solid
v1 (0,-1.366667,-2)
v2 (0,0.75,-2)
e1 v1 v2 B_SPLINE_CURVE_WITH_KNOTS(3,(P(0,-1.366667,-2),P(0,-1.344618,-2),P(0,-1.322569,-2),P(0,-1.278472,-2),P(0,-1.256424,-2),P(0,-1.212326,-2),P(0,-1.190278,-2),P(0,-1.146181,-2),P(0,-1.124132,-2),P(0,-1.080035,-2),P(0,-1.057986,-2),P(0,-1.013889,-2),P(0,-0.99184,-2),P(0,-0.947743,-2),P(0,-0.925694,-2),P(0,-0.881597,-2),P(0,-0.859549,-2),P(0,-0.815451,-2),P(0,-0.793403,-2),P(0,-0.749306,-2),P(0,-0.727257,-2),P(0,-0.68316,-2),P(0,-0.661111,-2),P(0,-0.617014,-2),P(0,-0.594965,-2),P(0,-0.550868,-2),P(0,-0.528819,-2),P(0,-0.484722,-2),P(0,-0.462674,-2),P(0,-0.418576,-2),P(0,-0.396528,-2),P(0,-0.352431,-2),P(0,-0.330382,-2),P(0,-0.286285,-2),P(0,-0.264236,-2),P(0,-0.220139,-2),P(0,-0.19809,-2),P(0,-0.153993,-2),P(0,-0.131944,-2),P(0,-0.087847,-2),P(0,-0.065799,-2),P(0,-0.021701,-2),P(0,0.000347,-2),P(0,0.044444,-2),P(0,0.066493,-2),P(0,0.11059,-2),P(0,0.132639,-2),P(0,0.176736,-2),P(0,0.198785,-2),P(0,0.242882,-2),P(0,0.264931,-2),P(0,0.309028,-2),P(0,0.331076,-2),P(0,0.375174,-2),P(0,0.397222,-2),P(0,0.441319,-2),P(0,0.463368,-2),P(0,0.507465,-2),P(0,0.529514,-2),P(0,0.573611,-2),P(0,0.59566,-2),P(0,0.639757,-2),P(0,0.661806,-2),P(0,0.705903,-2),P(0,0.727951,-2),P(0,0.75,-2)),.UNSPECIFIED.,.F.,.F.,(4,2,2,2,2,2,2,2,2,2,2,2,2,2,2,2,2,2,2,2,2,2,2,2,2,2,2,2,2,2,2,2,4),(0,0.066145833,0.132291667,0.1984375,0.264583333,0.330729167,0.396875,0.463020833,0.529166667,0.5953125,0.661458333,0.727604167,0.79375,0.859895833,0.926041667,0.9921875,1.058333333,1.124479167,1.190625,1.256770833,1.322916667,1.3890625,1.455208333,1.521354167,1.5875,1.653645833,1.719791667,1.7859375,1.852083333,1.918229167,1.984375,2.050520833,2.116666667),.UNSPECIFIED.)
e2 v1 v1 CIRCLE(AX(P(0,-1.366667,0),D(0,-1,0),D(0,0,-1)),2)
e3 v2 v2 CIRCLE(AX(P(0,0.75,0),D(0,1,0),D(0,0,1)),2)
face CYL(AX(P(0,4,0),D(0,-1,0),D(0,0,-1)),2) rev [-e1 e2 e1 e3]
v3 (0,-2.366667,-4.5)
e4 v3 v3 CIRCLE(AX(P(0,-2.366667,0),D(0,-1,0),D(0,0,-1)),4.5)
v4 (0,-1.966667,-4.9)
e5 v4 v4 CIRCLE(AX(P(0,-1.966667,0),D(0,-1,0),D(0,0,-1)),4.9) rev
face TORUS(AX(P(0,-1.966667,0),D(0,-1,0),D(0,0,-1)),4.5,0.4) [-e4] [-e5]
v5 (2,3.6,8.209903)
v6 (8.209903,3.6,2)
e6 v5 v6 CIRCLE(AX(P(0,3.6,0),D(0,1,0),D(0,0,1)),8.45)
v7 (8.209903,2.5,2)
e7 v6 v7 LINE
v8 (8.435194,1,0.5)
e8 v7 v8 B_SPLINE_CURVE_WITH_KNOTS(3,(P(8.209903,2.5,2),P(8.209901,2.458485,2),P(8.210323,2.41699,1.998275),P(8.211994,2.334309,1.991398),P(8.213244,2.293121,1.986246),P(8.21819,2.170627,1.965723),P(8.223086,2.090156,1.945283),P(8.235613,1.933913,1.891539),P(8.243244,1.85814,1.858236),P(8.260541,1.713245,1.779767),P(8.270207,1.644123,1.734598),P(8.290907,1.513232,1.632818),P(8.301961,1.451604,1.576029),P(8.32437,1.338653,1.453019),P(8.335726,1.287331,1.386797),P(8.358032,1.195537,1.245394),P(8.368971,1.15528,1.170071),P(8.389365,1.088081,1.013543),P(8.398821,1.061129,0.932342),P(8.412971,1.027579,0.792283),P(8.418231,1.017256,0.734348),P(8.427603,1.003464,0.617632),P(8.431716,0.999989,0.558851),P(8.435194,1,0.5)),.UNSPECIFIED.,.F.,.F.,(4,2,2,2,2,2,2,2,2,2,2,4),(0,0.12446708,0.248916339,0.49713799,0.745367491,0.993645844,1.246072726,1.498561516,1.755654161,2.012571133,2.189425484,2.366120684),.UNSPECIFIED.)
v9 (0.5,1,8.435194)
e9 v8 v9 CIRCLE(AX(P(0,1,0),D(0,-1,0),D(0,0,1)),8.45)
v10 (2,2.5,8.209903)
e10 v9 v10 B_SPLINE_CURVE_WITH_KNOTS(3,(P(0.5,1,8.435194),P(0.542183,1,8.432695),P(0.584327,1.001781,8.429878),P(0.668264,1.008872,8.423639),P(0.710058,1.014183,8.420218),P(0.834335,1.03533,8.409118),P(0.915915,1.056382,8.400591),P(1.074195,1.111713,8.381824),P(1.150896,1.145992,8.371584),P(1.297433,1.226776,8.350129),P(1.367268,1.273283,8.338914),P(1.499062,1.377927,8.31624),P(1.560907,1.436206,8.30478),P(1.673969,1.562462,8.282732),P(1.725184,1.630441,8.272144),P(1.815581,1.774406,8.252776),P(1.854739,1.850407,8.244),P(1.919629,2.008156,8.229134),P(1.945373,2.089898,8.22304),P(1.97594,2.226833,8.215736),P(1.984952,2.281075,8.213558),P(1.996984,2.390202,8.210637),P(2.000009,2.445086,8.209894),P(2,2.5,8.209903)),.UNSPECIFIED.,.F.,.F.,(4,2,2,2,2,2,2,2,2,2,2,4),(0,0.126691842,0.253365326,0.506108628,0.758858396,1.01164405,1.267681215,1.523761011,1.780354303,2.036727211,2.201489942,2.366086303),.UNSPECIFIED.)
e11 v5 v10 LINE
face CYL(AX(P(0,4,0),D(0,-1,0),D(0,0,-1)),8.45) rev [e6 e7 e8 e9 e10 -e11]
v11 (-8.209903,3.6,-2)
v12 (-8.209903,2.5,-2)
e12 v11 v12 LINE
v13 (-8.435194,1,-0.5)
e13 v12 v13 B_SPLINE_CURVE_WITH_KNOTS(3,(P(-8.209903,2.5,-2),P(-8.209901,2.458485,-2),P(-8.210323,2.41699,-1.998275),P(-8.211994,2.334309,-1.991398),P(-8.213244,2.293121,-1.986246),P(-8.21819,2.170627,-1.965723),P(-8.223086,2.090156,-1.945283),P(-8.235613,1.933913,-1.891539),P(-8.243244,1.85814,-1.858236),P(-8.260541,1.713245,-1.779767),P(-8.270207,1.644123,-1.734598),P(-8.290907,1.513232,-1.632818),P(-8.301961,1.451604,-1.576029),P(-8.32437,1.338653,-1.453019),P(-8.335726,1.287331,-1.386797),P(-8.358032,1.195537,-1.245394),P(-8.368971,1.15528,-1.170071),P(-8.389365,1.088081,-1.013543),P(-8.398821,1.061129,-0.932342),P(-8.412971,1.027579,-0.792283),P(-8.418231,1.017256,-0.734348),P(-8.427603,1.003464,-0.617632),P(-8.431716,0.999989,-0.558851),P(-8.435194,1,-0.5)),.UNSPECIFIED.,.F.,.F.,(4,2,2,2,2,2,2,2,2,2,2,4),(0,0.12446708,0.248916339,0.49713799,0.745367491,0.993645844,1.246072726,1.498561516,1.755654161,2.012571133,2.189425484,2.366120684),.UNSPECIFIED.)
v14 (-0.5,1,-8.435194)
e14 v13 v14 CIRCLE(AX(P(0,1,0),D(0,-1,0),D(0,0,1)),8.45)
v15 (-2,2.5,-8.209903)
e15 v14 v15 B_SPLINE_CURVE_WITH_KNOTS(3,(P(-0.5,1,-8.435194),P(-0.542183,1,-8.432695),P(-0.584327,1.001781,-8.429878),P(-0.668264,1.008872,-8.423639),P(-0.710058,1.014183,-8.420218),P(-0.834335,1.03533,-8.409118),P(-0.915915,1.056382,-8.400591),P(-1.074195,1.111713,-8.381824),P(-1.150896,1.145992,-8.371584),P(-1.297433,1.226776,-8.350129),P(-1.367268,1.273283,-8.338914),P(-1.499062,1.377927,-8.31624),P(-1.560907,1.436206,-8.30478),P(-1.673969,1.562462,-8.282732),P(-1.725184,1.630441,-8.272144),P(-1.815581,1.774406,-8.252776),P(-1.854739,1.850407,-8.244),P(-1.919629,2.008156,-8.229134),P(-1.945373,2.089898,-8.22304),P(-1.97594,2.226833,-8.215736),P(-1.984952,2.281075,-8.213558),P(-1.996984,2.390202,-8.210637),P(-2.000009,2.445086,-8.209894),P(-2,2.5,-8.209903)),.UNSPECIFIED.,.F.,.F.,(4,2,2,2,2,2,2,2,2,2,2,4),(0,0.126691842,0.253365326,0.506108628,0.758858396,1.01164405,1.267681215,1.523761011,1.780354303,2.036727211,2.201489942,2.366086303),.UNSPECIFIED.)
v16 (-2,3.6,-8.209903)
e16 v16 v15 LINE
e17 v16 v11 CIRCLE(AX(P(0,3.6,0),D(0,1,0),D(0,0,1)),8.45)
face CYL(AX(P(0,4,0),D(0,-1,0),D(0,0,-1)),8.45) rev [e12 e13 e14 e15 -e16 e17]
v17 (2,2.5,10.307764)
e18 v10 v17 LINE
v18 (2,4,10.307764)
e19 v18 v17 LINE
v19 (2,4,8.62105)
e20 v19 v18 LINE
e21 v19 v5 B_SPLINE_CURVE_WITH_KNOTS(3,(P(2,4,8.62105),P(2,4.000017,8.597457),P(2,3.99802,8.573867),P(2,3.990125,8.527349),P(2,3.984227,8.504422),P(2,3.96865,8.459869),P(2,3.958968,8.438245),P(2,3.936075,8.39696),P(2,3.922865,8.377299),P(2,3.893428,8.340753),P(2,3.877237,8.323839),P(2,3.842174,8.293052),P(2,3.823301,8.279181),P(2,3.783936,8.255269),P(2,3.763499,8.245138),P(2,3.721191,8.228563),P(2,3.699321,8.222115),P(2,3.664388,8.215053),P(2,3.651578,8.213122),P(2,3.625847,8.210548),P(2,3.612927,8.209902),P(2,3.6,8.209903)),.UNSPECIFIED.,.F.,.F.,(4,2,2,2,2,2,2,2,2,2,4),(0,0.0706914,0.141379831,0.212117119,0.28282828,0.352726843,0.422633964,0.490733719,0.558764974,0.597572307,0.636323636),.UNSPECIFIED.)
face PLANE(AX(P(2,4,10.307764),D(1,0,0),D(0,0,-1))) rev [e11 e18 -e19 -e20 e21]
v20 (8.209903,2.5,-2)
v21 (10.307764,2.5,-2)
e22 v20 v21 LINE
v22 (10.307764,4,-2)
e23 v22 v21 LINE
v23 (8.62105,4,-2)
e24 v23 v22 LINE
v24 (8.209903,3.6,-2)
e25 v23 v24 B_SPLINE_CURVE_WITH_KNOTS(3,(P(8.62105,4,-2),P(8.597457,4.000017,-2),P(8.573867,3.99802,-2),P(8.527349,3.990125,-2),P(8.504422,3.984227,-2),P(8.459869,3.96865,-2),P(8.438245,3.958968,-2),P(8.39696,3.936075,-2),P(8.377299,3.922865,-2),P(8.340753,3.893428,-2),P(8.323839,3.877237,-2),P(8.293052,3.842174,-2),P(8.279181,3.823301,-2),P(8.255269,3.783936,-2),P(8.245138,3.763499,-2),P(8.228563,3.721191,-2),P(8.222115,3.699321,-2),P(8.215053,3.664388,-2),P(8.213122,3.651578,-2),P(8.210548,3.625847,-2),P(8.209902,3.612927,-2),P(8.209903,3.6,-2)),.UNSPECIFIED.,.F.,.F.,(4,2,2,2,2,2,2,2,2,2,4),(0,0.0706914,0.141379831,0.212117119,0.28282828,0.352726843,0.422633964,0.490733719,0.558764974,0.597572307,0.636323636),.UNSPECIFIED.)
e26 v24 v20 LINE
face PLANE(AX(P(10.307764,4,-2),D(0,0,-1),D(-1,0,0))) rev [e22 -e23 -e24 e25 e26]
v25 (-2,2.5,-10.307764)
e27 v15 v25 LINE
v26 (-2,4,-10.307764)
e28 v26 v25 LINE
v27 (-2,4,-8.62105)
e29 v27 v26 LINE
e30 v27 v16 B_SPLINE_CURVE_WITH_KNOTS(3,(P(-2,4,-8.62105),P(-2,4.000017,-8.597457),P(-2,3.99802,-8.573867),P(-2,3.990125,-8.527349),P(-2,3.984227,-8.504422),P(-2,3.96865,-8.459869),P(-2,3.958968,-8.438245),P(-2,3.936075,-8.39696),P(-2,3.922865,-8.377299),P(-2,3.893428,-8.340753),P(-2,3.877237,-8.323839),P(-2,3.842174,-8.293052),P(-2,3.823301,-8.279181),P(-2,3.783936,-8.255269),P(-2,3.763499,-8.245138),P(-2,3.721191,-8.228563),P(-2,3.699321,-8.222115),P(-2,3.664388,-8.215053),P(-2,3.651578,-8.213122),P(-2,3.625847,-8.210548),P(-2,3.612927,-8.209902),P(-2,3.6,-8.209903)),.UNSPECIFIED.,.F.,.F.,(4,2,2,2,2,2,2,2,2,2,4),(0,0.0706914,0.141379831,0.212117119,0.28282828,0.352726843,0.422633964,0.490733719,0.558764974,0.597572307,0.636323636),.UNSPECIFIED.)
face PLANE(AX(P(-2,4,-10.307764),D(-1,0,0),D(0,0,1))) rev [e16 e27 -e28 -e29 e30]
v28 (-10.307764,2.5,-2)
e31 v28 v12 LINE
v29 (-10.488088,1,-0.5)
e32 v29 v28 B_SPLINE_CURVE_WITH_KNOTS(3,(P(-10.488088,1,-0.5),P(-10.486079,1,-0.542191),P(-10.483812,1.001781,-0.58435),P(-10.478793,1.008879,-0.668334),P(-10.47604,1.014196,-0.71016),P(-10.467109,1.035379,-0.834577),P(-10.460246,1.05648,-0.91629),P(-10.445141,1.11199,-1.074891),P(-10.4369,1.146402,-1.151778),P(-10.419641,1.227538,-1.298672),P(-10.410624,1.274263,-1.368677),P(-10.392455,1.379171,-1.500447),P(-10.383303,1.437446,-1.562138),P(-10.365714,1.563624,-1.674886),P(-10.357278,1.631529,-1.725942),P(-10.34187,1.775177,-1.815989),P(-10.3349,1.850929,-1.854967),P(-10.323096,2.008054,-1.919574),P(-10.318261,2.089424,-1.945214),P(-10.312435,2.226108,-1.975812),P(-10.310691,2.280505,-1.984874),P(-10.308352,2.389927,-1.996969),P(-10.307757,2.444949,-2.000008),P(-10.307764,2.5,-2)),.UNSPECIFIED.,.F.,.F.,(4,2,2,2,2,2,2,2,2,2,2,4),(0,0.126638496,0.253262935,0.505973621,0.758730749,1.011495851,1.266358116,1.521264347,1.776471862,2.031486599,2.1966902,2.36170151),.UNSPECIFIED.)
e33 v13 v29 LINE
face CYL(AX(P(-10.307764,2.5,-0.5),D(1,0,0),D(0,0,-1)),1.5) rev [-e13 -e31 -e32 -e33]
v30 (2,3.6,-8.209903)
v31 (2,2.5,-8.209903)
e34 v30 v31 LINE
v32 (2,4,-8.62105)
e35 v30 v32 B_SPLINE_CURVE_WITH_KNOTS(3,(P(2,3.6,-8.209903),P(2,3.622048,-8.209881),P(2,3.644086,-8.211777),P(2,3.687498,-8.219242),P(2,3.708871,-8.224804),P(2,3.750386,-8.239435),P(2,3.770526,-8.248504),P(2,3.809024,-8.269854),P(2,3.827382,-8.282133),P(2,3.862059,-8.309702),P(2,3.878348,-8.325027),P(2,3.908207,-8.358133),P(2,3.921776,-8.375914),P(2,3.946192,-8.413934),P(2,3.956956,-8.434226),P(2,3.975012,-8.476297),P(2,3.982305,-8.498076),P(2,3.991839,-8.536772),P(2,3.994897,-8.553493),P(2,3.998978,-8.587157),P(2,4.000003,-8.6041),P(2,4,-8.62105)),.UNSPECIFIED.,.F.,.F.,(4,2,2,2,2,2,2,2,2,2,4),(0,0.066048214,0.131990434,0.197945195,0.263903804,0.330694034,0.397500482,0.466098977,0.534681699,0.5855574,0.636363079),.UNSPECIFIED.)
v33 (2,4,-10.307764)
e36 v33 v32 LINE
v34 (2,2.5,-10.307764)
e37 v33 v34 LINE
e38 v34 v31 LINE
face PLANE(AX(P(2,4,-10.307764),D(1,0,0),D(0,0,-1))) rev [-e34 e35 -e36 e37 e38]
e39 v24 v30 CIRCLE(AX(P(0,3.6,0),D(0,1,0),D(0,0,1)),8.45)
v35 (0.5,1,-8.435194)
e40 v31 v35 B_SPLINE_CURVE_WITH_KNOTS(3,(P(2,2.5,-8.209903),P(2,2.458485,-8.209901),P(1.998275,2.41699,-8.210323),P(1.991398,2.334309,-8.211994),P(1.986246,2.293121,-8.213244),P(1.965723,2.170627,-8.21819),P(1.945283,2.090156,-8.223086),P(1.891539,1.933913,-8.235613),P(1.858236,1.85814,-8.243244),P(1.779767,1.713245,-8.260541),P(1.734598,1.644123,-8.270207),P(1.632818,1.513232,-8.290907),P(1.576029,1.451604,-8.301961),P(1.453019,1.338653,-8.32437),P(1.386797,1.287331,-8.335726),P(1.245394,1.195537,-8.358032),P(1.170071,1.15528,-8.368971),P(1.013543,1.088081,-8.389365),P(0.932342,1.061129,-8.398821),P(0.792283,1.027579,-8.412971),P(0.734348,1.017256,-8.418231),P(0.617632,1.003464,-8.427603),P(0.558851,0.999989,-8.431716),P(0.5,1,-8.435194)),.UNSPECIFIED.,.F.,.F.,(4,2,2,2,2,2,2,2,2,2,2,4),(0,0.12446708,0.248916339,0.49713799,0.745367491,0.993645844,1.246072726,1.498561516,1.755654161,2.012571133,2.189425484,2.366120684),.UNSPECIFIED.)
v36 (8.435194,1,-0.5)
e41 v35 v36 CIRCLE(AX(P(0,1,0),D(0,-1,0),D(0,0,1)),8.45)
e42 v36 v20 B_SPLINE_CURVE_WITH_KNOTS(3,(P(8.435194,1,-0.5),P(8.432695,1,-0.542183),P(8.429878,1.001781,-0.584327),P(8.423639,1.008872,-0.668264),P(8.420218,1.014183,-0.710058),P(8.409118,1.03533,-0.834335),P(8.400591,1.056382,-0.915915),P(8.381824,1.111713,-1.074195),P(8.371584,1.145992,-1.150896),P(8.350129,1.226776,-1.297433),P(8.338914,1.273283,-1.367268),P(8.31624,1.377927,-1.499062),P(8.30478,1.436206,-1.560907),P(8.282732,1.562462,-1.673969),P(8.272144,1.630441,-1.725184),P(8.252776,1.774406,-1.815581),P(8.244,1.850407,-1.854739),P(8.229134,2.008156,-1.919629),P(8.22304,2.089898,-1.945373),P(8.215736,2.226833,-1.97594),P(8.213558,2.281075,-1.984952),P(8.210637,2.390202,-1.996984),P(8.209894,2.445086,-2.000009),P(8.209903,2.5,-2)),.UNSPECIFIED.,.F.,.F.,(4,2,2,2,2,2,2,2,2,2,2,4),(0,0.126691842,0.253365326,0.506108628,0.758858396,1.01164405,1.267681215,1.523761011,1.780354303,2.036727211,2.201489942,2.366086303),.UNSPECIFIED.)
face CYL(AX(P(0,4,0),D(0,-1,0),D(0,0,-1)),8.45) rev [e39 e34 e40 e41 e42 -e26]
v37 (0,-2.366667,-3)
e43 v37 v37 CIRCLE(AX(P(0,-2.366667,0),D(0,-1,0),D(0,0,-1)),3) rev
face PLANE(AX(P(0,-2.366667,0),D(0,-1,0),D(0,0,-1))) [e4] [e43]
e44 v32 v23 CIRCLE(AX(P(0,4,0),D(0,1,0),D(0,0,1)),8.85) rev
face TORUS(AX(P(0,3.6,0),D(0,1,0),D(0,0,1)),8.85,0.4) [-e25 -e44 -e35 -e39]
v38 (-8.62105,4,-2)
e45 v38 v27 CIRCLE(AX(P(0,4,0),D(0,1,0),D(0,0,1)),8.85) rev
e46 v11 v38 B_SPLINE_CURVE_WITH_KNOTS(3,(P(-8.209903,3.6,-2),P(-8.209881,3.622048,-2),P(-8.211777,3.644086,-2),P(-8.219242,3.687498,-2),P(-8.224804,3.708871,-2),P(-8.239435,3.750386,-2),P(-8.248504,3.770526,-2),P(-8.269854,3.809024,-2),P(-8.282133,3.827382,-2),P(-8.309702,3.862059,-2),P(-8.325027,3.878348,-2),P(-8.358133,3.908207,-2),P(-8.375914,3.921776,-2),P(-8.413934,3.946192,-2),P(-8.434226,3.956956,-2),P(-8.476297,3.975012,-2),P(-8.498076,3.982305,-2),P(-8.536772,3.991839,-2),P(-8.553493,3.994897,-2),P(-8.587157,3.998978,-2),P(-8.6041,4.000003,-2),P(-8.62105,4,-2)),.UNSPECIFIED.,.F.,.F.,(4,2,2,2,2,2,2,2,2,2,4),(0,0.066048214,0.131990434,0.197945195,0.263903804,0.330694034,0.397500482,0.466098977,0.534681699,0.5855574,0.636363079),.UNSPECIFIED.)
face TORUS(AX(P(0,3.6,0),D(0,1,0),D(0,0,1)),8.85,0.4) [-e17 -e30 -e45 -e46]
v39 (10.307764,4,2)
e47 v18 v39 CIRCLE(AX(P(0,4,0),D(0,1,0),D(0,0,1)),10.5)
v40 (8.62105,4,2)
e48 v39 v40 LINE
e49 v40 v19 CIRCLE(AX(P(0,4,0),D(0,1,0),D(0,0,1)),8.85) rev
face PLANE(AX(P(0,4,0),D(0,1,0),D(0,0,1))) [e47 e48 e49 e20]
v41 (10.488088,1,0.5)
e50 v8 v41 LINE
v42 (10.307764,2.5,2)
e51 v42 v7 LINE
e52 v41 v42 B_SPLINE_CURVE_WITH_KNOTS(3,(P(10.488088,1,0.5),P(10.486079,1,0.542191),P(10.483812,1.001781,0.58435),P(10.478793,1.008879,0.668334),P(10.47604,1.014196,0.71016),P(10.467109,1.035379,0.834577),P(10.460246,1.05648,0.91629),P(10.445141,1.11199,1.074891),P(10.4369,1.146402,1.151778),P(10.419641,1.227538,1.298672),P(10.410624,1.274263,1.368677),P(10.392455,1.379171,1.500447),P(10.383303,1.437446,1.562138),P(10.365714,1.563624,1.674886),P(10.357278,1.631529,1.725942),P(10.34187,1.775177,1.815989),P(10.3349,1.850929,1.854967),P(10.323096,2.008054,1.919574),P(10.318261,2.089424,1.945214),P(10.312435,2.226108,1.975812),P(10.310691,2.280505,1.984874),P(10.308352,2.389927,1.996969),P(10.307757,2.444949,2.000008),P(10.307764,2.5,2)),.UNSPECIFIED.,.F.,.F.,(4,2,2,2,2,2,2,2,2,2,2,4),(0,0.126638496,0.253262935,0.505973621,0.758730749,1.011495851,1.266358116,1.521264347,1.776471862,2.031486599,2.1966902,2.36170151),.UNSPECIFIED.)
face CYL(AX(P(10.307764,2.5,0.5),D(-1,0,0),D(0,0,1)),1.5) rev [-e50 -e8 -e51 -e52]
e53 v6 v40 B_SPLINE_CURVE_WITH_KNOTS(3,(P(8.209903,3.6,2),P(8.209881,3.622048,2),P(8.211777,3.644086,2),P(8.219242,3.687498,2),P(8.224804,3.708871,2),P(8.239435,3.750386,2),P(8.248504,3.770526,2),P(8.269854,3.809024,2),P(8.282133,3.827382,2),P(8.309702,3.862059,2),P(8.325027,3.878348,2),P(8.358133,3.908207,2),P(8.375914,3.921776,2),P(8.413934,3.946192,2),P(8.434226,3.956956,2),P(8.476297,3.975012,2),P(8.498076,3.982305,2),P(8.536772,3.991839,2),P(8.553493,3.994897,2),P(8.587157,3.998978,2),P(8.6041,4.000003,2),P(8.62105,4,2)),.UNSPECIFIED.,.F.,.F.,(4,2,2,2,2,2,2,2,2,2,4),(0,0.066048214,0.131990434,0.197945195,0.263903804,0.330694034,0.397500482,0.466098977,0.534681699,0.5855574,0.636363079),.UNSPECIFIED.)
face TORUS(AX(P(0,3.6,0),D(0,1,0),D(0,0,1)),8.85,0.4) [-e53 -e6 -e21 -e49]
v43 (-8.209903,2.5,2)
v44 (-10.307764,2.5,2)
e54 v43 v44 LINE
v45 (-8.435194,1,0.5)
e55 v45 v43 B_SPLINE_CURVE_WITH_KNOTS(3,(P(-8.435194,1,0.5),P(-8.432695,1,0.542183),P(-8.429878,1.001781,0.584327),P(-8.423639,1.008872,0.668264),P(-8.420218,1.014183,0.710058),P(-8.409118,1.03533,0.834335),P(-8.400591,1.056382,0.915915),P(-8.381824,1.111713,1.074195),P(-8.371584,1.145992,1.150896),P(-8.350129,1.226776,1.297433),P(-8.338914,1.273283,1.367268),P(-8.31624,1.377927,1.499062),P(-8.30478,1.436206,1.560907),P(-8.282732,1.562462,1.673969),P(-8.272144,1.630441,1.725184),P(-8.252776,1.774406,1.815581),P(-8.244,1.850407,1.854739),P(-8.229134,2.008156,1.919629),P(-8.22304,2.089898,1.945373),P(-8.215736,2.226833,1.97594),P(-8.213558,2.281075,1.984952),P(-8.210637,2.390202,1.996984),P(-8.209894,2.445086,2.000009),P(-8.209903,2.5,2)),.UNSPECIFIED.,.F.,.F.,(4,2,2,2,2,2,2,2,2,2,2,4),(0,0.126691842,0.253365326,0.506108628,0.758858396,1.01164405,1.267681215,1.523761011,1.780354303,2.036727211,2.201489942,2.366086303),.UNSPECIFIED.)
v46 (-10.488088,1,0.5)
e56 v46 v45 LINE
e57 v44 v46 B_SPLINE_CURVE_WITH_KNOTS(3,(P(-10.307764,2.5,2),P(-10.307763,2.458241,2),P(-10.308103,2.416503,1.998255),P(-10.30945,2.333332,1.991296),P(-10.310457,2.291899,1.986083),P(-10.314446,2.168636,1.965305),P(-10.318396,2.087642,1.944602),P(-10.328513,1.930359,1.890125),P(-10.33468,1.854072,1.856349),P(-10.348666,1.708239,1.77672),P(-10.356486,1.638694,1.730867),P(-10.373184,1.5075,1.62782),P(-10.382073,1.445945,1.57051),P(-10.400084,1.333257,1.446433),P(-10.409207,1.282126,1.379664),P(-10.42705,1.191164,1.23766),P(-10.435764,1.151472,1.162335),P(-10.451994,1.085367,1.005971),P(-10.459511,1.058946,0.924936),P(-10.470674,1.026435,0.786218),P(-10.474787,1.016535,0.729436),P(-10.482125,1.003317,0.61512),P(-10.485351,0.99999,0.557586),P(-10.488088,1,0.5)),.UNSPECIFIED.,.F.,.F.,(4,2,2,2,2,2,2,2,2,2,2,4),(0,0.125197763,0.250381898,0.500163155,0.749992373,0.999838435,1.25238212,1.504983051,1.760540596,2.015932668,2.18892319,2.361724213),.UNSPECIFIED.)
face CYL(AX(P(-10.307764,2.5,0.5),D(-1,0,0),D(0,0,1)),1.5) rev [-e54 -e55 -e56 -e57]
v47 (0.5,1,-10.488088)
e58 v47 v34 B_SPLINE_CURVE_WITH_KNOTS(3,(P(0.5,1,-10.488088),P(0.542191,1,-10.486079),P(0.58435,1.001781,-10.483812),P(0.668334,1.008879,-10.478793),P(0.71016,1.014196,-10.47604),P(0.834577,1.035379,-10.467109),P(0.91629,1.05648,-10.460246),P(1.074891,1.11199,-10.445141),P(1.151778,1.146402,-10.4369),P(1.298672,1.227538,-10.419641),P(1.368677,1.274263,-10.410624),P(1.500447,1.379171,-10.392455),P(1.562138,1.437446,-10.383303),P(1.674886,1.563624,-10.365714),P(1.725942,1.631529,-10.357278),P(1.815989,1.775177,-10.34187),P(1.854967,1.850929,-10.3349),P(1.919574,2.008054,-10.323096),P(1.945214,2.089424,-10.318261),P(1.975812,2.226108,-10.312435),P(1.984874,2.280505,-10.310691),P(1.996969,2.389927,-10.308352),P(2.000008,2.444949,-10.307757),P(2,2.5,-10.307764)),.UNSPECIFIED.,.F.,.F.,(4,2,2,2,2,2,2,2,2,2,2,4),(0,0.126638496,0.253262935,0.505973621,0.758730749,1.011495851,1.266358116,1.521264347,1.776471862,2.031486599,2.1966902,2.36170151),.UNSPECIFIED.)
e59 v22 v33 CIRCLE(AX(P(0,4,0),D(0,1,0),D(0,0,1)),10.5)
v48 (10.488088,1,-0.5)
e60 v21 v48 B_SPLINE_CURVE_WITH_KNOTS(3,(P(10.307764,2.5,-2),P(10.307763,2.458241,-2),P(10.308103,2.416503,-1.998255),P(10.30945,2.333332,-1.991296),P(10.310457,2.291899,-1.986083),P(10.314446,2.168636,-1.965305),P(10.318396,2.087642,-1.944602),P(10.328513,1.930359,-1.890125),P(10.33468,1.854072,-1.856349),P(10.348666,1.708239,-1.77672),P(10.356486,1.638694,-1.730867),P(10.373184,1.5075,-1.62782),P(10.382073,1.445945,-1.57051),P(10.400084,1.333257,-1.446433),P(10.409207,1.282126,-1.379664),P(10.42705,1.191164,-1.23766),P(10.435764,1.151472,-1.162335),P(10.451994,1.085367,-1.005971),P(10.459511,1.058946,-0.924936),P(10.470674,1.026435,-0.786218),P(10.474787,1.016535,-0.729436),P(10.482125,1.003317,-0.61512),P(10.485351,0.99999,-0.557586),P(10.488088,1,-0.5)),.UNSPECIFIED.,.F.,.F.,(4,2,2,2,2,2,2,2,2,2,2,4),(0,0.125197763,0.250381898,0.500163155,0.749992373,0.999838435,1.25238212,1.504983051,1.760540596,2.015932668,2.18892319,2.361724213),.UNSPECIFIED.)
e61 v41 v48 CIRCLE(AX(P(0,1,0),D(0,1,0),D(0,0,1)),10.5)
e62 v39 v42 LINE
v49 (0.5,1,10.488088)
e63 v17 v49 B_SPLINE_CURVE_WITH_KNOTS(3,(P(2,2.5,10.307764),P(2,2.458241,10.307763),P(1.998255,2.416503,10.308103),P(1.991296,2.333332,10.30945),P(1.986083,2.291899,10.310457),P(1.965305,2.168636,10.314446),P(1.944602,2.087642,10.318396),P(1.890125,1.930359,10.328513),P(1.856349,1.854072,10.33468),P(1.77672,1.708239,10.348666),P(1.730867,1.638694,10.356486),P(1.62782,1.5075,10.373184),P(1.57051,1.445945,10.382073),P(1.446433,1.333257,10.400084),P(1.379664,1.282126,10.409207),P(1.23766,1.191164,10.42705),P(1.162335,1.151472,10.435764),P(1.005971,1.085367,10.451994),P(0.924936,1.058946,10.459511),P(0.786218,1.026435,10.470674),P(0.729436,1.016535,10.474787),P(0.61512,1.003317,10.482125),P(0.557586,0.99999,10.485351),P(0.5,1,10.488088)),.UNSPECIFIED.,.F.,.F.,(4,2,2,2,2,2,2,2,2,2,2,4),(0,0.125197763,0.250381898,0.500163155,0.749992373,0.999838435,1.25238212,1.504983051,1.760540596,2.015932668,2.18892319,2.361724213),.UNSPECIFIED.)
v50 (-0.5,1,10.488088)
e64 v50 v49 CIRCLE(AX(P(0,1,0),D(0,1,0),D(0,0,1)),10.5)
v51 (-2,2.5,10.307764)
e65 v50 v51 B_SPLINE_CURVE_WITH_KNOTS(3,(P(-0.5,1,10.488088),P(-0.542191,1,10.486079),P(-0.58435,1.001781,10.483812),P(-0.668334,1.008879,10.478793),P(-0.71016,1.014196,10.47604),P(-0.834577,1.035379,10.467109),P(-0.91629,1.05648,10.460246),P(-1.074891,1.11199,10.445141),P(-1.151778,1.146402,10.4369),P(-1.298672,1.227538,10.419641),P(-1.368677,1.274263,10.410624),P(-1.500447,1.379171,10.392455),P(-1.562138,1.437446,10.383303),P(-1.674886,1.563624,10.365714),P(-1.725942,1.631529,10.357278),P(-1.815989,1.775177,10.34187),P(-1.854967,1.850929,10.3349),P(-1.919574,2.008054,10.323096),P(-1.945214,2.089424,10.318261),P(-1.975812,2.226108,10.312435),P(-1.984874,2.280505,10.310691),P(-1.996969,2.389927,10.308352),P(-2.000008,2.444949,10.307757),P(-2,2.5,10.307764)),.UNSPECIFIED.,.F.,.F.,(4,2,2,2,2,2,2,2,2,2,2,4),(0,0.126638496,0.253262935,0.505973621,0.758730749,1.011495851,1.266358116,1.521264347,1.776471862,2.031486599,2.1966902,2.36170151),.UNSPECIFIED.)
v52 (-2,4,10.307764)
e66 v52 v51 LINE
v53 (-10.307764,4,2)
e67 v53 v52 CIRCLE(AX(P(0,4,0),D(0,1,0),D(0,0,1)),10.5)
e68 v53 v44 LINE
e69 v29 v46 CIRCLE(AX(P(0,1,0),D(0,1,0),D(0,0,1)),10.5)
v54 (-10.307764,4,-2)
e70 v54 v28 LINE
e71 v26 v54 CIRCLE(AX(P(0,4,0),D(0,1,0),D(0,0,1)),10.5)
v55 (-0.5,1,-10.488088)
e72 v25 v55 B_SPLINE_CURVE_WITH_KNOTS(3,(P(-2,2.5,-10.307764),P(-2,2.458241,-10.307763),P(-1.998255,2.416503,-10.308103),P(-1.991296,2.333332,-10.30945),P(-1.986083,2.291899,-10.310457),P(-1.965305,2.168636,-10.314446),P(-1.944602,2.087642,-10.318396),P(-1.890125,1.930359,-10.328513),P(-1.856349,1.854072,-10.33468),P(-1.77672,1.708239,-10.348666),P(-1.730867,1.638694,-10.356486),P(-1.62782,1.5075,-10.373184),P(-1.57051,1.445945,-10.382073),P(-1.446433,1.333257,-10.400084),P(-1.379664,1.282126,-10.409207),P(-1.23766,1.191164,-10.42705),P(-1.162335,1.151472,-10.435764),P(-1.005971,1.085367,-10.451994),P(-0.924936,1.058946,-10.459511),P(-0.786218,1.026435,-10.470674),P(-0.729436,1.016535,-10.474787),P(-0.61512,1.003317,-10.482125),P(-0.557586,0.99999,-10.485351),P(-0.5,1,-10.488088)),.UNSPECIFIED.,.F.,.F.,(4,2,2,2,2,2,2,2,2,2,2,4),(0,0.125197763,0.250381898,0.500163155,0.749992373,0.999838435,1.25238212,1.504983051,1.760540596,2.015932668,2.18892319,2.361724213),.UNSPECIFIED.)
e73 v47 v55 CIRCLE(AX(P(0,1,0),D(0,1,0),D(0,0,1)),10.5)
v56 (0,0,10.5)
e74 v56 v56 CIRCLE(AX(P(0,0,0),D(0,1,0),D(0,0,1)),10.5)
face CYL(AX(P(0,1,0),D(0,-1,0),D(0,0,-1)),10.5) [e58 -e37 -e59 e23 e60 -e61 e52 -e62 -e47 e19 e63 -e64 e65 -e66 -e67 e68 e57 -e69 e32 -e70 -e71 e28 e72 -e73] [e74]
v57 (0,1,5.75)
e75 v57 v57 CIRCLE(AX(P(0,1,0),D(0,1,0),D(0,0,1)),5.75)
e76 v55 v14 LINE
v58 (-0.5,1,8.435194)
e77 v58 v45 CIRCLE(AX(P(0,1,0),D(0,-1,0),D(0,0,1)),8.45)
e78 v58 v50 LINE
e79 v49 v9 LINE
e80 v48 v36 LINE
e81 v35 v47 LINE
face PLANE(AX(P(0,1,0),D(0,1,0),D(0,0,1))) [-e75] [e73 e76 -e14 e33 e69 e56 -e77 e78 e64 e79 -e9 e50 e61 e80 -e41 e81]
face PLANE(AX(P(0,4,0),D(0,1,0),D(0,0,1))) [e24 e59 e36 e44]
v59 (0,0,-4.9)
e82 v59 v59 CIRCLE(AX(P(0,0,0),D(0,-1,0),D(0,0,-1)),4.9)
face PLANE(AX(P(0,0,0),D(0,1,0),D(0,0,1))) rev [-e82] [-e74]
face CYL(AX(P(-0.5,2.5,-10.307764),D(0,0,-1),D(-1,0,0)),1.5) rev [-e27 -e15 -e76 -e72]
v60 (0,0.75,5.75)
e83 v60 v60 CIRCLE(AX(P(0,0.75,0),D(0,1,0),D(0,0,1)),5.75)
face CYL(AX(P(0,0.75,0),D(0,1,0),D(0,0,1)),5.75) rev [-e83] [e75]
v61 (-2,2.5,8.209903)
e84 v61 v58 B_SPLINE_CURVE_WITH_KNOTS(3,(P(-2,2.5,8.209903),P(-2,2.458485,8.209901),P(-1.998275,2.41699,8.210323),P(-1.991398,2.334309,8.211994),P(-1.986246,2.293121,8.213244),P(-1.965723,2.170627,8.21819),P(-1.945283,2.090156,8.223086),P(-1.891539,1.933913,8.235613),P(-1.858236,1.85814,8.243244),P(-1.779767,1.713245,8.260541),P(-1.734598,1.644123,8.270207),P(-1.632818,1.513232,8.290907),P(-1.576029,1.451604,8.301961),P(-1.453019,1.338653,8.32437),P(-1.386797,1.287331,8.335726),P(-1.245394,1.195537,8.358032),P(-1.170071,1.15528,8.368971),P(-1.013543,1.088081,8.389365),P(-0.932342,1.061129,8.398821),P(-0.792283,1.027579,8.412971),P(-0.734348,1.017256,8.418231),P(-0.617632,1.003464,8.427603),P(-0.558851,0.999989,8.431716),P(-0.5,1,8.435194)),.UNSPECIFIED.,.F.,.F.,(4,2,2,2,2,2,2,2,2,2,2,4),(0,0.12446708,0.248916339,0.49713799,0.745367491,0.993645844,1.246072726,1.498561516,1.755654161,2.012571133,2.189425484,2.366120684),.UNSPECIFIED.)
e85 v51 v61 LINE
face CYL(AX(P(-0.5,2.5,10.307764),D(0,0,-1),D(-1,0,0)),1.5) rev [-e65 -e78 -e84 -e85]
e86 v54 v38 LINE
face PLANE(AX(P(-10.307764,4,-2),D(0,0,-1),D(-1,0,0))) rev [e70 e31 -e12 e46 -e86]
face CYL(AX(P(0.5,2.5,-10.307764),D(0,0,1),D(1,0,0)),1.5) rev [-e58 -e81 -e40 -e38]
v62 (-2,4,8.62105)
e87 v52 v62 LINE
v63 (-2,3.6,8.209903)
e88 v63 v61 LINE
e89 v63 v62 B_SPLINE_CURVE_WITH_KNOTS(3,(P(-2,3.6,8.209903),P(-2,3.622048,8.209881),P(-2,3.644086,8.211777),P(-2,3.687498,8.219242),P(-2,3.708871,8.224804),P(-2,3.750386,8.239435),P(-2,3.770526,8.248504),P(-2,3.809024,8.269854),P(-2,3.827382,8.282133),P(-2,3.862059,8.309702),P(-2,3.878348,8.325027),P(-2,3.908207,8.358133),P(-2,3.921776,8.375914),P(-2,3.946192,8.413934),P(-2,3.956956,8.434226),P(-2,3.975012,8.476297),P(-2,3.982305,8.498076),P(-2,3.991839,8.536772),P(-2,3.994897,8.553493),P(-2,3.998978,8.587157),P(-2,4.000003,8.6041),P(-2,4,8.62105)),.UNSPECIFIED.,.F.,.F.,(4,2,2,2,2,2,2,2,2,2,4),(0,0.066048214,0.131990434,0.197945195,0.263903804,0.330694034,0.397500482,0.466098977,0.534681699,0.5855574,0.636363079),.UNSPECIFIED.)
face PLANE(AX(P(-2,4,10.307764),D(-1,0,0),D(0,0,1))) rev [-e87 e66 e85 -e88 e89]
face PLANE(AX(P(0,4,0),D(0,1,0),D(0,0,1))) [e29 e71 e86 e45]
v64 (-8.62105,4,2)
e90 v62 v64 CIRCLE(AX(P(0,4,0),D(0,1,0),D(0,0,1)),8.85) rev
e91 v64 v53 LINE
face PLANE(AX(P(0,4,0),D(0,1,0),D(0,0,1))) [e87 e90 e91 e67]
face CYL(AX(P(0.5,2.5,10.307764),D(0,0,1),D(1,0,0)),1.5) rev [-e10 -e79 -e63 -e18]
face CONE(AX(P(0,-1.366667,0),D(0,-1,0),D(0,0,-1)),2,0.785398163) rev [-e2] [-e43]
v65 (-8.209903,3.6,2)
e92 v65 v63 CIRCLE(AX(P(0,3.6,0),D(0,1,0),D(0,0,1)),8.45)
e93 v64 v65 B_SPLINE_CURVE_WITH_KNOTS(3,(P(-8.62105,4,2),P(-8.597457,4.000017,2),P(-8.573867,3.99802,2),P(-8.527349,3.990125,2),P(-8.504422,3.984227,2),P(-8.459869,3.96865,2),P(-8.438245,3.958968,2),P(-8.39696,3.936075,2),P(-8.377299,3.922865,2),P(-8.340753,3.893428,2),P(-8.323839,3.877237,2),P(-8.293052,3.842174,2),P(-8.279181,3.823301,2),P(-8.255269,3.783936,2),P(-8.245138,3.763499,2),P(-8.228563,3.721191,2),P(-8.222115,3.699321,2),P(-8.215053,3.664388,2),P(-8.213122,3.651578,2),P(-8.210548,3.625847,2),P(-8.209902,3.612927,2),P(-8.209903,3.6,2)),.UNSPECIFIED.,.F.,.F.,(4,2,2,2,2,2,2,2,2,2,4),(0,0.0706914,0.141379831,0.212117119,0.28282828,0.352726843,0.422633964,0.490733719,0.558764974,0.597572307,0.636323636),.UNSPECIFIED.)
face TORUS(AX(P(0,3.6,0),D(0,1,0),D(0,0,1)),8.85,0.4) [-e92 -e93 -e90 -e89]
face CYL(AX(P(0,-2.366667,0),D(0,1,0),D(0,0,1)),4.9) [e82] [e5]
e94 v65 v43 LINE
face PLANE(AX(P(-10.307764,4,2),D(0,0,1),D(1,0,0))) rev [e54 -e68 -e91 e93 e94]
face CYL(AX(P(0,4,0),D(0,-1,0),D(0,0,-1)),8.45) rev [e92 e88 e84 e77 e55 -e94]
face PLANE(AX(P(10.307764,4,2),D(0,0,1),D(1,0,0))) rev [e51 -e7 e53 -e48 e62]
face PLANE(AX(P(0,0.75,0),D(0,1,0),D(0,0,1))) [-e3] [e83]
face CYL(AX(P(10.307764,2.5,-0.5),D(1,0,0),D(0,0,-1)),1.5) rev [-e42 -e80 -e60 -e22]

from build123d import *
from build123d.topology import SkipClean

# Parameters (mm, degrees)
SKETCH1_R      = 10.5
EXTRUDE1_DEPTH = 1
EXTRUDE6_DEPTH = 3
SKETCH9_R      = 5.75
EXTRUDE9_DEPTH = 0.25
SKETCH7_R      = 4.9
EXTRUDE7_DEPTH = 2.366666667
SKETCH8_R      = 2
EXTRUDE8_DEPTH = 17.156560415
FILLET2_R      = 0.4
CHAMFER2_SIZE  = 1
FILLET3_R      = 1.5


with BuildPart() as part:
    # Sketch1 → Extrude1 (new body)
    with BuildSketch(Plane(origin=(0, 0, 0), x_dir=(1, 0, 0), z_dir=(0, 1, 0))):
        with Locations(Location((0, 0, 0), (0, 0, 270))):
            Circle(SKETCH1_R)
    extrude(amount=EXTRUDE1_DEPTH)

    # Sketch6 → Extrude6 (add)
    with SkipClean():  # the faces are left unmerged after this step: merging them gives an invalid solid
        with BuildSketch(Plane(origin=(0, 1, 0), x_dir=(1, 0, 0), z_dir=(0, 1, 0))):
            with BuildLine():
                Line((-2, 10.307764064), (-2, 8.209902557))
                ThreePointArc((-2, 8.209902557), (-5.975052301, 5.975052301), (-8.209902557, 2))
                Line((-8.209902557, 2), (-10.307764064, 2))
                ThreePointArc((-10.307764064, 2), (-7.424621202, 7.424621202), (-2, 10.307764064))
            make_face()
            with BuildLine():
                Line((2, 10.307764064), (2, 8.209902557))
                ThreePointArc((2, 8.209902557), (5.975052301, 5.975052301), (8.209902557, 2))
                Line((8.209902557, 2), (10.307764064, 2))
                ThreePointArc((10.307764064, 2), (7.424621202, 7.424621202), (2, 10.307764064))
            make_face()
            with BuildLine():
                Line((10.307764064, -2), (8.209902557, -2))
                ThreePointArc((8.209902557, -2), (5.975052301, -5.975052301), (2, -8.209902557))
                Line((2, -8.209902557), (2, -10.307764064))
                ThreePointArc((2, -10.307764064), (7.424621202, -7.424621202), (10.307764064, -2))
            make_face()
            with BuildLine():
                Line((-2, -10.307764064), (-2, -8.209902557))
                ThreePointArc((-2, -8.209902557), (-5.975052301, -5.975052301), (-8.209902557, -2))
                Line((-8.209902557, -2), (-10.307764064, -2))
                ThreePointArc((-10.307764064, -2), (-7.424621202, -7.424621202), (-2, -10.307764064))
            make_face()
        extrude(amount=EXTRUDE6_DEPTH)

    # Sketch9 → Extrude9 (cut)
    with SkipClean():  # the faces are left unmerged after this step: merging them gives an invalid solid
        with BuildSketch(Plane(origin=(0, 1, 0), x_dir=(1, 0, 0), z_dir=(0, 1, 0))):
            with Locations(Location((0, 0, 0), (0, 0, 270))):
                Circle(SKETCH9_R)
        extrude(amount=-EXTRUDE9_DEPTH, mode=Mode.SUBTRACT)

    # Sketch7 → Extrude7 (add)
    with SkipClean():  # the faces are left unmerged after this step: merging them gives an invalid solid
        with BuildSketch(Plane.XZ):
            with Locations(Location((0, 0, 0), (0, 0, 270))):
                Circle(SKETCH7_R)
        extrude(amount=EXTRUDE7_DEPTH)

    # Sketch8 → Extrude8 (cut, through all)
    with SkipClean():  # the faces are left unmerged after this step: merging them gives an invalid solid
        with BuildSketch(Plane.XZ.offset(2.366666667)):
            with Locations(Location((0, 0, 0), (0, 0, 270))):
                Circle(SKETCH8_R)
        extrude(amount=-EXTRUDE8_DEPTH, mode=Mode.SUBTRACT)

    # Fillet2
    fillet2_edges = [part.edges().sort_by_distance(p)[0] for p in [
        (5.975052301, 4, -5.975052301),
        (5.975052301, 4, 5.975052301),
        (-5.975052301, 4, 5.975052301),
        (0, -2.366666667, 4.9),
        (-5.975052301, 4, -5.975052301),
    ]]
    fillet(fillet2_edges, radius=FILLET2_R)

    # Chamfer2
    chamfer2_edges = [part.edges().sort_by_distance(p)[0] for p in [
        (0, -2.366666667, 2),
    ]]
    chamfer(chamfer2_edges, length=CHAMFER2_SIZE)

    # Fillet3
    # the kernel refuses this fillet: 1.5 mm, written as the material it adds along each edge
    with BuildSketch(Plane(origin=(2, 1, -14.057764064), x_dir=(-1, 0, 0), z_dir=(0, 0, 1))) as fillet3_piece_1_section:
        with BuildLine():
            CenterArc((FILLET3_R, -FILLET3_R), FILLET3_R, 90, 90)
            Line((0, -FILLET3_R), (0, 0))
            Line((0, 0), (FILLET3_R, 0))
        make_face()
    fillet3_piece_1 = extrude(amount=9.597861507, mode=Mode.PRIVATE)
    fillet3_piece_1 = fillet3_piece_1 & Plane(origin=(0, 1.340711746, 0), x_dir=(0, 0, 1), z_dir=(0, -1, 0)) * Cylinder(10.5, 26, mode=Mode.PRIVATE)
    fillet3_piece_1 = fillet3_piece_1 - Plane(origin=(0, 1.340711746, 0), x_dir=(0.23668639053254556, 0, -0.9715861014530186), z_dir=(0, -1, 0)) * Cylinder(8.45, 26, mode=Mode.PRIVATE)
    with BuildSketch(Plane(origin=(4.459902557, 1, -2), x_dir=(0, 0, 1), z_dir=(1, 0, 0))) as fillet3_piece_2_section:
        with BuildLine():
            CenterArc((FILLET3_R, -FILLET3_R), FILLET3_R, 90, 90)
            Line((0, -FILLET3_R), (0, 0))
            Line((0, 0), (FILLET3_R, 0))
        make_face()
    fillet3_piece_2 = extrude(amount=9.597861507, mode=Mode.PRIVATE)
    fillet3_piece_2 = fillet3_piece_2 & Plane(origin=(0, 1.34071094, 0), x_dir=(0, 0, 1), z_dir=(0, -1, 0)) * Cylinder(10.5, 26, mode=Mode.PRIVATE)
    fillet3_piece_2 = fillet3_piece_2 - Plane(origin=(0, 1.34071094, 0), x_dir=(0.23668639053254556, 0, -0.9715861014530186), z_dir=(0, -1, 0)) * Cylinder(8.45, 26, mode=Mode.PRIVATE)
    with BuildSketch(Plane(origin=(14.057764064, 1, 2), x_dir=(0, 0, -1), z_dir=(-1, 0, 0))) as fillet3_piece_3_section:
        with BuildLine():
            CenterArc((FILLET3_R, -FILLET3_R), FILLET3_R, 90, 90)
            Line((0, -FILLET3_R), (0, 0))
            Line((0, 0), (FILLET3_R, 0))
        make_face()
    fillet3_piece_3 = extrude(amount=9.597861507, mode=Mode.PRIVATE)
    fillet3_piece_3 = fillet3_piece_3 & Plane(origin=(0, 1.340711718, 0), x_dir=(0, 0, 1), z_dir=(0, -1, 0)) * Cylinder(10.5, 26, mode=Mode.PRIVATE)
    fillet3_piece_3 = fillet3_piece_3 - Plane(origin=(0, 1.340711718, 0), x_dir=(0.9715861014530187, 0, 0.2366863905325454), z_dir=(0, -1, 0)) * Cylinder(8.45, 26, mode=Mode.PRIVATE)
    with BuildSketch(Plane(origin=(2, 1, 4.459902557), x_dir=(-1, 0, 0), z_dir=(0, 0, 1))) as fillet3_piece_4_section:
        with BuildLine():
            CenterArc((FILLET3_R, -FILLET3_R), FILLET3_R, 90, 90)
            Line((0, -FILLET3_R), (0, 0))
            Line((0, 0), (FILLET3_R, 0))
        make_face()
    fillet3_piece_4 = extrude(amount=9.597861507, mode=Mode.PRIVATE)
    fillet3_piece_4 = fillet3_piece_4 & Plane(origin=(0, 1.34071094, 0), x_dir=(0, 0, 1), z_dir=(0, -1, 0)) * Cylinder(10.5, 26, mode=Mode.PRIVATE)
    fillet3_piece_4 = fillet3_piece_4 - Plane(origin=(0, 1.34071094, 0), x_dir=(0.9715861014530187, 0, 0.2366863905325454), z_dir=(0, -1, 0)) * Cylinder(8.45, 26, mode=Mode.PRIVATE)
    with BuildSketch(Plane(origin=(-2, 1, 14.057764064), x_dir=(1, 0, 0), z_dir=(0, 0, -1))) as fillet3_piece_5_section:
        with BuildLine():
            CenterArc((FILLET3_R, -FILLET3_R), FILLET3_R, 90, 90)
            Line((0, -FILLET3_R), (0, 0))
            Line((0, 0), (FILLET3_R, 0))
        make_face()
    fillet3_piece_5 = extrude(amount=9.597861507, mode=Mode.PRIVATE)
    fillet3_piece_5 = fillet3_piece_5 & Plane(origin=(0, 1.340711184, 0), x_dir=(0, 0, 1), z_dir=(0, -1, 0)) * Cylinder(10.5, 26, mode=Mode.PRIVATE)
    fillet3_piece_5 = fillet3_piece_5 - Plane(origin=(0, 1.340711184, 0), x_dir=(-0.2366863905325458, 0, 0.9715861014530186), z_dir=(0, -1, 0)) * Cylinder(8.45, 26, mode=Mode.PRIVATE)
    with BuildSketch(Plane(origin=(-4.459902557, 1, 2), x_dir=(0, 0, -1), z_dir=(-1, 0, 0))) as fillet3_piece_6_section:
        with BuildLine():
            CenterArc((FILLET3_R, -FILLET3_R), FILLET3_R, 90, 90)
            Line((0, -FILLET3_R), (0, 0))
            Line((0, 0), (FILLET3_R, 0))
        make_face()
    fillet3_piece_6 = extrude(amount=9.597861507, mode=Mode.PRIVATE)
    fillet3_piece_6 = fillet3_piece_6 & Plane(origin=(0, 1.34071094, 0), x_dir=(0, 0, 1), z_dir=(0, -1, 0)) * Cylinder(10.5, 26, mode=Mode.PRIVATE)
    fillet3_piece_6 = fillet3_piece_6 - Plane(origin=(0, 1.34071094, 0), x_dir=(-0.2366863905325458, 0, 0.9715861014530186), z_dir=(0, -1, 0)) * Cylinder(8.45, 26, mode=Mode.PRIVATE)
    with BuildSketch(Plane(origin=(-4.459902557, 1, -2), x_dir=(0, 0, 1), z_dir=(-1, 0, 0))) as fillet3_piece_7_section:
        with BuildLine():
            CenterArc((FILLET3_R, FILLET3_R), FILLET3_R, 180, 90)
            Line((0, FILLET3_R), (0, 0))
            Line((0, 0), (FILLET3_R, 0))
        make_face()
    fillet3_piece_7 = extrude(amount=9.597861507, mode=Mode.PRIVATE)
    fillet3_piece_7 = fillet3_piece_7 & Plane(origin=(0, 1.340712249, 0), x_dir=(0, 0, 1), z_dir=(0, -1, 0)) * Cylinder(10.5, 26, mode=Mode.PRIVATE)
    fillet3_piece_7 = fillet3_piece_7 - Plane(origin=(0, 1.340712249, 0), x_dir=(-0.23668639053254495, 0, -0.9715861014530188), z_dir=(0, -1, 0)) * Cylinder(8.45, 26, mode=Mode.PRIVATE)
    with BuildSketch(Plane(origin=(-2, 1, -14.057764064), x_dir=(1, 0, 0), z_dir=(0, 0, 1))) as fillet3_piece_8_section:
        with BuildLine():
            CenterArc((FILLET3_R, FILLET3_R), FILLET3_R, 180, 90)
            Line((0, FILLET3_R), (0, 0))
            Line((0, 0), (FILLET3_R, 0))
        make_face()
    fillet3_piece_8 = extrude(amount=9.597861507, mode=Mode.PRIVATE)
    fillet3_piece_8 = fillet3_piece_8 & Plane(origin=(0, 1.340709875, 0), x_dir=(0, 0, 1), z_dir=(0, -1, 0)) * Cylinder(10.5, 26, mode=Mode.PRIVATE)
    fillet3_piece_8 = fillet3_piece_8 - Plane(origin=(0, 1.340709875, 0), x_dir=(-0.23668639053254495, 0, -0.9715861014530188), z_dir=(0, -1, 0)) * Cylinder(8.45, 26, mode=Mode.PRIVATE)
    add([fillet3_piece_1, fillet3_piece_2, fillet3_piece_3, fillet3_piece_4, fillet3_piece_5, fillet3_piece_6, fillet3_piece_7, fillet3_piece_8])


solid = part.part
